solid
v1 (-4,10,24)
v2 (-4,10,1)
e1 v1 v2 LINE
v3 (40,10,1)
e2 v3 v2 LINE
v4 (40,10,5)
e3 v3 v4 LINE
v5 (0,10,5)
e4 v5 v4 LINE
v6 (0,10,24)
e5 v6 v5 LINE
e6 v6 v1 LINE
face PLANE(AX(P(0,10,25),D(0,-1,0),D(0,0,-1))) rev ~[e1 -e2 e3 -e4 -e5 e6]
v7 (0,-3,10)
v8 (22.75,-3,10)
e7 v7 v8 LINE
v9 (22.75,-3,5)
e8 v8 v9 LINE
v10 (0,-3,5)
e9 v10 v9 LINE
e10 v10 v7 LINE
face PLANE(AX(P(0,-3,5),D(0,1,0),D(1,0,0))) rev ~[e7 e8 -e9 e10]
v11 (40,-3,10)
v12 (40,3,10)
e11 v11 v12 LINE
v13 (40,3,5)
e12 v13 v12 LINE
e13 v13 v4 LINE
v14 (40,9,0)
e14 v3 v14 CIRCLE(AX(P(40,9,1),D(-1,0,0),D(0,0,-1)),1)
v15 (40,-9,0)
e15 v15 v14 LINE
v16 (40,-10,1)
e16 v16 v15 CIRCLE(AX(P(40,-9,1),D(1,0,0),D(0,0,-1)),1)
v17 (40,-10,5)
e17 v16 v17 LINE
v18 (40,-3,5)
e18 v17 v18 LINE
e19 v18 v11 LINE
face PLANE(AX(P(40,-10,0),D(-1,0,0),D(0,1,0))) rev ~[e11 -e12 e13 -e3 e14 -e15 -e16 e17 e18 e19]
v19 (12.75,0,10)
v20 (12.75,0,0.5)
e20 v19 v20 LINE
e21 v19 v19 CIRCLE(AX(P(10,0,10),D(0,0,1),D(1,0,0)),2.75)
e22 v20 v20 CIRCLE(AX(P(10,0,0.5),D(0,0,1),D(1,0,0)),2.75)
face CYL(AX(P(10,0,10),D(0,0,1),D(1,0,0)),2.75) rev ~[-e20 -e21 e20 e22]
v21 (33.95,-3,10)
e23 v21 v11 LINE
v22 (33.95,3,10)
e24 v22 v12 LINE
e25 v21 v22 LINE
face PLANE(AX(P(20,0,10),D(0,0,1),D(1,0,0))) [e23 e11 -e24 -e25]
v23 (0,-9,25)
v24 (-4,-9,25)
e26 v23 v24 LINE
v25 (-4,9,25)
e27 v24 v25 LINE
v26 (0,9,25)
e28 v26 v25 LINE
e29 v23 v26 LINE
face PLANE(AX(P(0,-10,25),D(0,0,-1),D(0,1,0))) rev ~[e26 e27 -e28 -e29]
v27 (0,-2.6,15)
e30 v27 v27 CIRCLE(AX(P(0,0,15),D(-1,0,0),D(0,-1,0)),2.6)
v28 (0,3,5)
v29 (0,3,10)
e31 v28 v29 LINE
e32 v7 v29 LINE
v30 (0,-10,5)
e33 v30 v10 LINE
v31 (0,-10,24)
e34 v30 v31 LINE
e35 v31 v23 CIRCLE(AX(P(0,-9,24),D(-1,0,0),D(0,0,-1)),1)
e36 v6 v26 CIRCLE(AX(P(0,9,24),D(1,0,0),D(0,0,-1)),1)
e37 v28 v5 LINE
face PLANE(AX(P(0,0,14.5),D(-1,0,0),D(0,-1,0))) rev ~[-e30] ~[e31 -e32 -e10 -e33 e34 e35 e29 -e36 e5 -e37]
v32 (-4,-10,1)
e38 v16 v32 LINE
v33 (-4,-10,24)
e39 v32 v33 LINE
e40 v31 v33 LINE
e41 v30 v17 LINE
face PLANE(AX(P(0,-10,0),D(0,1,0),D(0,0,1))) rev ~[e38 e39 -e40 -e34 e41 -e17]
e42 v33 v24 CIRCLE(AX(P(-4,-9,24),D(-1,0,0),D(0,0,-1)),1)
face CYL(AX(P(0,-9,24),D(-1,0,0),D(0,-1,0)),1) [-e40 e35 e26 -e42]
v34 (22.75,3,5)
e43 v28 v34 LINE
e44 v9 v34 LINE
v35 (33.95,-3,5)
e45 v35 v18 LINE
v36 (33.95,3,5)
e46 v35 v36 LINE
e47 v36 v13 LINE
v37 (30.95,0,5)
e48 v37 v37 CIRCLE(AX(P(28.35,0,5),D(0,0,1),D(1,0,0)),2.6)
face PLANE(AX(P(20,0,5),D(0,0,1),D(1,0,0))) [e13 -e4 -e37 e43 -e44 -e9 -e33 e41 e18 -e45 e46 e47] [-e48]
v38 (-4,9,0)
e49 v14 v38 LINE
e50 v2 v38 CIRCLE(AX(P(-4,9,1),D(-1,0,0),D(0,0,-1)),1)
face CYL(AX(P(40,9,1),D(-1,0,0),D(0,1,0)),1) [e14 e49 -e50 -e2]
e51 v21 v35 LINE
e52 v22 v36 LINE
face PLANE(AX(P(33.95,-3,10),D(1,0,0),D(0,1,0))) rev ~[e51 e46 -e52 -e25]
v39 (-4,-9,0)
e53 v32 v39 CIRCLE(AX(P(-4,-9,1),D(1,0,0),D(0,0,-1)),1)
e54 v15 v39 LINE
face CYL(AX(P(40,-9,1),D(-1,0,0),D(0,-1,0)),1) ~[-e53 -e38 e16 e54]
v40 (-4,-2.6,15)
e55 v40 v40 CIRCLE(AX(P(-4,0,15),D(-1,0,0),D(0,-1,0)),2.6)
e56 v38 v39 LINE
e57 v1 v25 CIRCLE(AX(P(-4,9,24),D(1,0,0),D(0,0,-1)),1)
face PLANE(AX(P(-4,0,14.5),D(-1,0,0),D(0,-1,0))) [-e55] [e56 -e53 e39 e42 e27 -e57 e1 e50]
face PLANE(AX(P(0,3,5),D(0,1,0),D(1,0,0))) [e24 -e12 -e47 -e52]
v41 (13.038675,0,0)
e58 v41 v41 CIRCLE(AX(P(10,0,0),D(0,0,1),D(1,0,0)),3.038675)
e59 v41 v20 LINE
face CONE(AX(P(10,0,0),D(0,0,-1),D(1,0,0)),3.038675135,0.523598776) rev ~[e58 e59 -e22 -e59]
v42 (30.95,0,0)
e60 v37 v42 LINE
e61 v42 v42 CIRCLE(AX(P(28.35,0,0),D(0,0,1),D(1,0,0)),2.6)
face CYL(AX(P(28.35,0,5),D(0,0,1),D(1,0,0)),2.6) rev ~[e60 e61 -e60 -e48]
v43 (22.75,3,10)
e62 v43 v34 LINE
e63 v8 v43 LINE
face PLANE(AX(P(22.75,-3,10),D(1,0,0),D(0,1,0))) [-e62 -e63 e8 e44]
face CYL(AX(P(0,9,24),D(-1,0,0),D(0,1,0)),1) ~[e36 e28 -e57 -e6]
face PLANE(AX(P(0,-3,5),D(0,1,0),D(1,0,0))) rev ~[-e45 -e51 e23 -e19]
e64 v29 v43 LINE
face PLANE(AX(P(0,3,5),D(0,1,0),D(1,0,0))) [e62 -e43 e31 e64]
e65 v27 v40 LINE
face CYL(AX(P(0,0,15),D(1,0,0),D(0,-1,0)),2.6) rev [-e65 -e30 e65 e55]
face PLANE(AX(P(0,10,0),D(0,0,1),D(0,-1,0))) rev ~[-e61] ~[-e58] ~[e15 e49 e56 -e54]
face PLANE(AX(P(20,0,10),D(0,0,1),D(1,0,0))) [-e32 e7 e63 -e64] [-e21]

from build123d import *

# Parameters (mm, degrees)
F0_W      = 40
F0_H      = 20
F1_DEPTH  = 5
F2_W      = 40
F2_H      = 6
F3_DEPTH  = 5
F4_R      = 2.75
F5_DEPTH  = 25
F6_W      = 11.2
F6_H      = 6
F7_DEPTH  = 5
F8_R      = 2.6
F9_DEPTH  = 5
F10_R     = 2.6
F11_DEPTH = 4
F12_R     = 1


# Not quite as in the source:
# - a fillet or chamfer that OpenCascade refuses, or shapes differently, is made with other operations: its cross-section is extruded or revolved along the edge and cut away or added
# - a feature names something its author has since deleted; it is built from what else it names


with BuildPart() as f1:
    # F0 (on Top) → F1 (new body)
    with BuildSketch(Plane.XY):
        with Locations((20, 0)):
            Rectangle(F0_W, F0_H)
    extrude(amount=F1_DEPTH)

    # F2 (on face) → F3 (join)
    with BuildSketch(Plane.XY.offset(5)):
        with Locations((20, 0)):
            Rectangle(F2_W, F2_H)
    extrude(amount=F3_DEPTH)

    # F4 (on face) → F5 (cut)
    with BuildSketch(Plane.XY.offset(10)):
        with Locations((10, 0)):
            Circle(F4_R)
    extrude(amount=-F5_DEPTH, mode=Mode.SUBTRACT)

    # F6 (on face) → F7 (cut, through all)
    with BuildSketch(Plane.XY.offset(10)):
        with Locations((28.35, 0)):
            Rectangle(F6_W, F6_H)
    extrude(amount=-F7_DEPTH, mode=Mode.SUBTRACT)

    # F8 (on face) → F9 (cut, through all)
    with BuildSketch(Plane.XY.offset(5)):
        with Locations((28.35, 0)):
            Circle(F8_R)
    extrude(amount=-F9_DEPTH, mode=Mode.SUBTRACT)

    # F10 (on face) → F11 (join)
    with BuildSketch(Plane(origin=(0, 0, 0), x_dir=(0, -1, 0), z_dir=(-1, 0, 0))):
        Polygon((-10, 25), (-10, 5), (-3, 5), (-3, 10), (3, 10), (3, 5), (10, 5), (10, 25), align=None)
        with Locations((0, 15)):
            Circle(F10_R, mode=Mode.SUBTRACT)
        Polygon((-10, 5), (-10, 0), (10, 0), (10, 5), (3, 5), (3, 10), (-3, 10), (-3, 5), align=None)
    extrude(amount=F11_DEPTH)

    # F12
    f12_edges = [f1.edges().sort_by_distance(p)[0] for p in [
        (-2, -10, 25),
        (-2, 10, 25),
        (18, -10, 0),
        (18, 10, 0),
    ]]
    fillet(f12_edges, radius=F12_R)

    # F13: chamfer of 0.5 x 0.2886751346 on 1 edges, made by hand

    # F13_s1 → F13_t2 (revolve, cut)
    with BuildSketch(Plane.XZ):
        Polygon((13.0386751346, 0), (12.75, 0.5), (12.75, 0), align=None)
    revolve(axis=Axis((10, 0, 0), (0, 0, 1)), mode=Mode.SUBTRACT)


solid = f1.part
